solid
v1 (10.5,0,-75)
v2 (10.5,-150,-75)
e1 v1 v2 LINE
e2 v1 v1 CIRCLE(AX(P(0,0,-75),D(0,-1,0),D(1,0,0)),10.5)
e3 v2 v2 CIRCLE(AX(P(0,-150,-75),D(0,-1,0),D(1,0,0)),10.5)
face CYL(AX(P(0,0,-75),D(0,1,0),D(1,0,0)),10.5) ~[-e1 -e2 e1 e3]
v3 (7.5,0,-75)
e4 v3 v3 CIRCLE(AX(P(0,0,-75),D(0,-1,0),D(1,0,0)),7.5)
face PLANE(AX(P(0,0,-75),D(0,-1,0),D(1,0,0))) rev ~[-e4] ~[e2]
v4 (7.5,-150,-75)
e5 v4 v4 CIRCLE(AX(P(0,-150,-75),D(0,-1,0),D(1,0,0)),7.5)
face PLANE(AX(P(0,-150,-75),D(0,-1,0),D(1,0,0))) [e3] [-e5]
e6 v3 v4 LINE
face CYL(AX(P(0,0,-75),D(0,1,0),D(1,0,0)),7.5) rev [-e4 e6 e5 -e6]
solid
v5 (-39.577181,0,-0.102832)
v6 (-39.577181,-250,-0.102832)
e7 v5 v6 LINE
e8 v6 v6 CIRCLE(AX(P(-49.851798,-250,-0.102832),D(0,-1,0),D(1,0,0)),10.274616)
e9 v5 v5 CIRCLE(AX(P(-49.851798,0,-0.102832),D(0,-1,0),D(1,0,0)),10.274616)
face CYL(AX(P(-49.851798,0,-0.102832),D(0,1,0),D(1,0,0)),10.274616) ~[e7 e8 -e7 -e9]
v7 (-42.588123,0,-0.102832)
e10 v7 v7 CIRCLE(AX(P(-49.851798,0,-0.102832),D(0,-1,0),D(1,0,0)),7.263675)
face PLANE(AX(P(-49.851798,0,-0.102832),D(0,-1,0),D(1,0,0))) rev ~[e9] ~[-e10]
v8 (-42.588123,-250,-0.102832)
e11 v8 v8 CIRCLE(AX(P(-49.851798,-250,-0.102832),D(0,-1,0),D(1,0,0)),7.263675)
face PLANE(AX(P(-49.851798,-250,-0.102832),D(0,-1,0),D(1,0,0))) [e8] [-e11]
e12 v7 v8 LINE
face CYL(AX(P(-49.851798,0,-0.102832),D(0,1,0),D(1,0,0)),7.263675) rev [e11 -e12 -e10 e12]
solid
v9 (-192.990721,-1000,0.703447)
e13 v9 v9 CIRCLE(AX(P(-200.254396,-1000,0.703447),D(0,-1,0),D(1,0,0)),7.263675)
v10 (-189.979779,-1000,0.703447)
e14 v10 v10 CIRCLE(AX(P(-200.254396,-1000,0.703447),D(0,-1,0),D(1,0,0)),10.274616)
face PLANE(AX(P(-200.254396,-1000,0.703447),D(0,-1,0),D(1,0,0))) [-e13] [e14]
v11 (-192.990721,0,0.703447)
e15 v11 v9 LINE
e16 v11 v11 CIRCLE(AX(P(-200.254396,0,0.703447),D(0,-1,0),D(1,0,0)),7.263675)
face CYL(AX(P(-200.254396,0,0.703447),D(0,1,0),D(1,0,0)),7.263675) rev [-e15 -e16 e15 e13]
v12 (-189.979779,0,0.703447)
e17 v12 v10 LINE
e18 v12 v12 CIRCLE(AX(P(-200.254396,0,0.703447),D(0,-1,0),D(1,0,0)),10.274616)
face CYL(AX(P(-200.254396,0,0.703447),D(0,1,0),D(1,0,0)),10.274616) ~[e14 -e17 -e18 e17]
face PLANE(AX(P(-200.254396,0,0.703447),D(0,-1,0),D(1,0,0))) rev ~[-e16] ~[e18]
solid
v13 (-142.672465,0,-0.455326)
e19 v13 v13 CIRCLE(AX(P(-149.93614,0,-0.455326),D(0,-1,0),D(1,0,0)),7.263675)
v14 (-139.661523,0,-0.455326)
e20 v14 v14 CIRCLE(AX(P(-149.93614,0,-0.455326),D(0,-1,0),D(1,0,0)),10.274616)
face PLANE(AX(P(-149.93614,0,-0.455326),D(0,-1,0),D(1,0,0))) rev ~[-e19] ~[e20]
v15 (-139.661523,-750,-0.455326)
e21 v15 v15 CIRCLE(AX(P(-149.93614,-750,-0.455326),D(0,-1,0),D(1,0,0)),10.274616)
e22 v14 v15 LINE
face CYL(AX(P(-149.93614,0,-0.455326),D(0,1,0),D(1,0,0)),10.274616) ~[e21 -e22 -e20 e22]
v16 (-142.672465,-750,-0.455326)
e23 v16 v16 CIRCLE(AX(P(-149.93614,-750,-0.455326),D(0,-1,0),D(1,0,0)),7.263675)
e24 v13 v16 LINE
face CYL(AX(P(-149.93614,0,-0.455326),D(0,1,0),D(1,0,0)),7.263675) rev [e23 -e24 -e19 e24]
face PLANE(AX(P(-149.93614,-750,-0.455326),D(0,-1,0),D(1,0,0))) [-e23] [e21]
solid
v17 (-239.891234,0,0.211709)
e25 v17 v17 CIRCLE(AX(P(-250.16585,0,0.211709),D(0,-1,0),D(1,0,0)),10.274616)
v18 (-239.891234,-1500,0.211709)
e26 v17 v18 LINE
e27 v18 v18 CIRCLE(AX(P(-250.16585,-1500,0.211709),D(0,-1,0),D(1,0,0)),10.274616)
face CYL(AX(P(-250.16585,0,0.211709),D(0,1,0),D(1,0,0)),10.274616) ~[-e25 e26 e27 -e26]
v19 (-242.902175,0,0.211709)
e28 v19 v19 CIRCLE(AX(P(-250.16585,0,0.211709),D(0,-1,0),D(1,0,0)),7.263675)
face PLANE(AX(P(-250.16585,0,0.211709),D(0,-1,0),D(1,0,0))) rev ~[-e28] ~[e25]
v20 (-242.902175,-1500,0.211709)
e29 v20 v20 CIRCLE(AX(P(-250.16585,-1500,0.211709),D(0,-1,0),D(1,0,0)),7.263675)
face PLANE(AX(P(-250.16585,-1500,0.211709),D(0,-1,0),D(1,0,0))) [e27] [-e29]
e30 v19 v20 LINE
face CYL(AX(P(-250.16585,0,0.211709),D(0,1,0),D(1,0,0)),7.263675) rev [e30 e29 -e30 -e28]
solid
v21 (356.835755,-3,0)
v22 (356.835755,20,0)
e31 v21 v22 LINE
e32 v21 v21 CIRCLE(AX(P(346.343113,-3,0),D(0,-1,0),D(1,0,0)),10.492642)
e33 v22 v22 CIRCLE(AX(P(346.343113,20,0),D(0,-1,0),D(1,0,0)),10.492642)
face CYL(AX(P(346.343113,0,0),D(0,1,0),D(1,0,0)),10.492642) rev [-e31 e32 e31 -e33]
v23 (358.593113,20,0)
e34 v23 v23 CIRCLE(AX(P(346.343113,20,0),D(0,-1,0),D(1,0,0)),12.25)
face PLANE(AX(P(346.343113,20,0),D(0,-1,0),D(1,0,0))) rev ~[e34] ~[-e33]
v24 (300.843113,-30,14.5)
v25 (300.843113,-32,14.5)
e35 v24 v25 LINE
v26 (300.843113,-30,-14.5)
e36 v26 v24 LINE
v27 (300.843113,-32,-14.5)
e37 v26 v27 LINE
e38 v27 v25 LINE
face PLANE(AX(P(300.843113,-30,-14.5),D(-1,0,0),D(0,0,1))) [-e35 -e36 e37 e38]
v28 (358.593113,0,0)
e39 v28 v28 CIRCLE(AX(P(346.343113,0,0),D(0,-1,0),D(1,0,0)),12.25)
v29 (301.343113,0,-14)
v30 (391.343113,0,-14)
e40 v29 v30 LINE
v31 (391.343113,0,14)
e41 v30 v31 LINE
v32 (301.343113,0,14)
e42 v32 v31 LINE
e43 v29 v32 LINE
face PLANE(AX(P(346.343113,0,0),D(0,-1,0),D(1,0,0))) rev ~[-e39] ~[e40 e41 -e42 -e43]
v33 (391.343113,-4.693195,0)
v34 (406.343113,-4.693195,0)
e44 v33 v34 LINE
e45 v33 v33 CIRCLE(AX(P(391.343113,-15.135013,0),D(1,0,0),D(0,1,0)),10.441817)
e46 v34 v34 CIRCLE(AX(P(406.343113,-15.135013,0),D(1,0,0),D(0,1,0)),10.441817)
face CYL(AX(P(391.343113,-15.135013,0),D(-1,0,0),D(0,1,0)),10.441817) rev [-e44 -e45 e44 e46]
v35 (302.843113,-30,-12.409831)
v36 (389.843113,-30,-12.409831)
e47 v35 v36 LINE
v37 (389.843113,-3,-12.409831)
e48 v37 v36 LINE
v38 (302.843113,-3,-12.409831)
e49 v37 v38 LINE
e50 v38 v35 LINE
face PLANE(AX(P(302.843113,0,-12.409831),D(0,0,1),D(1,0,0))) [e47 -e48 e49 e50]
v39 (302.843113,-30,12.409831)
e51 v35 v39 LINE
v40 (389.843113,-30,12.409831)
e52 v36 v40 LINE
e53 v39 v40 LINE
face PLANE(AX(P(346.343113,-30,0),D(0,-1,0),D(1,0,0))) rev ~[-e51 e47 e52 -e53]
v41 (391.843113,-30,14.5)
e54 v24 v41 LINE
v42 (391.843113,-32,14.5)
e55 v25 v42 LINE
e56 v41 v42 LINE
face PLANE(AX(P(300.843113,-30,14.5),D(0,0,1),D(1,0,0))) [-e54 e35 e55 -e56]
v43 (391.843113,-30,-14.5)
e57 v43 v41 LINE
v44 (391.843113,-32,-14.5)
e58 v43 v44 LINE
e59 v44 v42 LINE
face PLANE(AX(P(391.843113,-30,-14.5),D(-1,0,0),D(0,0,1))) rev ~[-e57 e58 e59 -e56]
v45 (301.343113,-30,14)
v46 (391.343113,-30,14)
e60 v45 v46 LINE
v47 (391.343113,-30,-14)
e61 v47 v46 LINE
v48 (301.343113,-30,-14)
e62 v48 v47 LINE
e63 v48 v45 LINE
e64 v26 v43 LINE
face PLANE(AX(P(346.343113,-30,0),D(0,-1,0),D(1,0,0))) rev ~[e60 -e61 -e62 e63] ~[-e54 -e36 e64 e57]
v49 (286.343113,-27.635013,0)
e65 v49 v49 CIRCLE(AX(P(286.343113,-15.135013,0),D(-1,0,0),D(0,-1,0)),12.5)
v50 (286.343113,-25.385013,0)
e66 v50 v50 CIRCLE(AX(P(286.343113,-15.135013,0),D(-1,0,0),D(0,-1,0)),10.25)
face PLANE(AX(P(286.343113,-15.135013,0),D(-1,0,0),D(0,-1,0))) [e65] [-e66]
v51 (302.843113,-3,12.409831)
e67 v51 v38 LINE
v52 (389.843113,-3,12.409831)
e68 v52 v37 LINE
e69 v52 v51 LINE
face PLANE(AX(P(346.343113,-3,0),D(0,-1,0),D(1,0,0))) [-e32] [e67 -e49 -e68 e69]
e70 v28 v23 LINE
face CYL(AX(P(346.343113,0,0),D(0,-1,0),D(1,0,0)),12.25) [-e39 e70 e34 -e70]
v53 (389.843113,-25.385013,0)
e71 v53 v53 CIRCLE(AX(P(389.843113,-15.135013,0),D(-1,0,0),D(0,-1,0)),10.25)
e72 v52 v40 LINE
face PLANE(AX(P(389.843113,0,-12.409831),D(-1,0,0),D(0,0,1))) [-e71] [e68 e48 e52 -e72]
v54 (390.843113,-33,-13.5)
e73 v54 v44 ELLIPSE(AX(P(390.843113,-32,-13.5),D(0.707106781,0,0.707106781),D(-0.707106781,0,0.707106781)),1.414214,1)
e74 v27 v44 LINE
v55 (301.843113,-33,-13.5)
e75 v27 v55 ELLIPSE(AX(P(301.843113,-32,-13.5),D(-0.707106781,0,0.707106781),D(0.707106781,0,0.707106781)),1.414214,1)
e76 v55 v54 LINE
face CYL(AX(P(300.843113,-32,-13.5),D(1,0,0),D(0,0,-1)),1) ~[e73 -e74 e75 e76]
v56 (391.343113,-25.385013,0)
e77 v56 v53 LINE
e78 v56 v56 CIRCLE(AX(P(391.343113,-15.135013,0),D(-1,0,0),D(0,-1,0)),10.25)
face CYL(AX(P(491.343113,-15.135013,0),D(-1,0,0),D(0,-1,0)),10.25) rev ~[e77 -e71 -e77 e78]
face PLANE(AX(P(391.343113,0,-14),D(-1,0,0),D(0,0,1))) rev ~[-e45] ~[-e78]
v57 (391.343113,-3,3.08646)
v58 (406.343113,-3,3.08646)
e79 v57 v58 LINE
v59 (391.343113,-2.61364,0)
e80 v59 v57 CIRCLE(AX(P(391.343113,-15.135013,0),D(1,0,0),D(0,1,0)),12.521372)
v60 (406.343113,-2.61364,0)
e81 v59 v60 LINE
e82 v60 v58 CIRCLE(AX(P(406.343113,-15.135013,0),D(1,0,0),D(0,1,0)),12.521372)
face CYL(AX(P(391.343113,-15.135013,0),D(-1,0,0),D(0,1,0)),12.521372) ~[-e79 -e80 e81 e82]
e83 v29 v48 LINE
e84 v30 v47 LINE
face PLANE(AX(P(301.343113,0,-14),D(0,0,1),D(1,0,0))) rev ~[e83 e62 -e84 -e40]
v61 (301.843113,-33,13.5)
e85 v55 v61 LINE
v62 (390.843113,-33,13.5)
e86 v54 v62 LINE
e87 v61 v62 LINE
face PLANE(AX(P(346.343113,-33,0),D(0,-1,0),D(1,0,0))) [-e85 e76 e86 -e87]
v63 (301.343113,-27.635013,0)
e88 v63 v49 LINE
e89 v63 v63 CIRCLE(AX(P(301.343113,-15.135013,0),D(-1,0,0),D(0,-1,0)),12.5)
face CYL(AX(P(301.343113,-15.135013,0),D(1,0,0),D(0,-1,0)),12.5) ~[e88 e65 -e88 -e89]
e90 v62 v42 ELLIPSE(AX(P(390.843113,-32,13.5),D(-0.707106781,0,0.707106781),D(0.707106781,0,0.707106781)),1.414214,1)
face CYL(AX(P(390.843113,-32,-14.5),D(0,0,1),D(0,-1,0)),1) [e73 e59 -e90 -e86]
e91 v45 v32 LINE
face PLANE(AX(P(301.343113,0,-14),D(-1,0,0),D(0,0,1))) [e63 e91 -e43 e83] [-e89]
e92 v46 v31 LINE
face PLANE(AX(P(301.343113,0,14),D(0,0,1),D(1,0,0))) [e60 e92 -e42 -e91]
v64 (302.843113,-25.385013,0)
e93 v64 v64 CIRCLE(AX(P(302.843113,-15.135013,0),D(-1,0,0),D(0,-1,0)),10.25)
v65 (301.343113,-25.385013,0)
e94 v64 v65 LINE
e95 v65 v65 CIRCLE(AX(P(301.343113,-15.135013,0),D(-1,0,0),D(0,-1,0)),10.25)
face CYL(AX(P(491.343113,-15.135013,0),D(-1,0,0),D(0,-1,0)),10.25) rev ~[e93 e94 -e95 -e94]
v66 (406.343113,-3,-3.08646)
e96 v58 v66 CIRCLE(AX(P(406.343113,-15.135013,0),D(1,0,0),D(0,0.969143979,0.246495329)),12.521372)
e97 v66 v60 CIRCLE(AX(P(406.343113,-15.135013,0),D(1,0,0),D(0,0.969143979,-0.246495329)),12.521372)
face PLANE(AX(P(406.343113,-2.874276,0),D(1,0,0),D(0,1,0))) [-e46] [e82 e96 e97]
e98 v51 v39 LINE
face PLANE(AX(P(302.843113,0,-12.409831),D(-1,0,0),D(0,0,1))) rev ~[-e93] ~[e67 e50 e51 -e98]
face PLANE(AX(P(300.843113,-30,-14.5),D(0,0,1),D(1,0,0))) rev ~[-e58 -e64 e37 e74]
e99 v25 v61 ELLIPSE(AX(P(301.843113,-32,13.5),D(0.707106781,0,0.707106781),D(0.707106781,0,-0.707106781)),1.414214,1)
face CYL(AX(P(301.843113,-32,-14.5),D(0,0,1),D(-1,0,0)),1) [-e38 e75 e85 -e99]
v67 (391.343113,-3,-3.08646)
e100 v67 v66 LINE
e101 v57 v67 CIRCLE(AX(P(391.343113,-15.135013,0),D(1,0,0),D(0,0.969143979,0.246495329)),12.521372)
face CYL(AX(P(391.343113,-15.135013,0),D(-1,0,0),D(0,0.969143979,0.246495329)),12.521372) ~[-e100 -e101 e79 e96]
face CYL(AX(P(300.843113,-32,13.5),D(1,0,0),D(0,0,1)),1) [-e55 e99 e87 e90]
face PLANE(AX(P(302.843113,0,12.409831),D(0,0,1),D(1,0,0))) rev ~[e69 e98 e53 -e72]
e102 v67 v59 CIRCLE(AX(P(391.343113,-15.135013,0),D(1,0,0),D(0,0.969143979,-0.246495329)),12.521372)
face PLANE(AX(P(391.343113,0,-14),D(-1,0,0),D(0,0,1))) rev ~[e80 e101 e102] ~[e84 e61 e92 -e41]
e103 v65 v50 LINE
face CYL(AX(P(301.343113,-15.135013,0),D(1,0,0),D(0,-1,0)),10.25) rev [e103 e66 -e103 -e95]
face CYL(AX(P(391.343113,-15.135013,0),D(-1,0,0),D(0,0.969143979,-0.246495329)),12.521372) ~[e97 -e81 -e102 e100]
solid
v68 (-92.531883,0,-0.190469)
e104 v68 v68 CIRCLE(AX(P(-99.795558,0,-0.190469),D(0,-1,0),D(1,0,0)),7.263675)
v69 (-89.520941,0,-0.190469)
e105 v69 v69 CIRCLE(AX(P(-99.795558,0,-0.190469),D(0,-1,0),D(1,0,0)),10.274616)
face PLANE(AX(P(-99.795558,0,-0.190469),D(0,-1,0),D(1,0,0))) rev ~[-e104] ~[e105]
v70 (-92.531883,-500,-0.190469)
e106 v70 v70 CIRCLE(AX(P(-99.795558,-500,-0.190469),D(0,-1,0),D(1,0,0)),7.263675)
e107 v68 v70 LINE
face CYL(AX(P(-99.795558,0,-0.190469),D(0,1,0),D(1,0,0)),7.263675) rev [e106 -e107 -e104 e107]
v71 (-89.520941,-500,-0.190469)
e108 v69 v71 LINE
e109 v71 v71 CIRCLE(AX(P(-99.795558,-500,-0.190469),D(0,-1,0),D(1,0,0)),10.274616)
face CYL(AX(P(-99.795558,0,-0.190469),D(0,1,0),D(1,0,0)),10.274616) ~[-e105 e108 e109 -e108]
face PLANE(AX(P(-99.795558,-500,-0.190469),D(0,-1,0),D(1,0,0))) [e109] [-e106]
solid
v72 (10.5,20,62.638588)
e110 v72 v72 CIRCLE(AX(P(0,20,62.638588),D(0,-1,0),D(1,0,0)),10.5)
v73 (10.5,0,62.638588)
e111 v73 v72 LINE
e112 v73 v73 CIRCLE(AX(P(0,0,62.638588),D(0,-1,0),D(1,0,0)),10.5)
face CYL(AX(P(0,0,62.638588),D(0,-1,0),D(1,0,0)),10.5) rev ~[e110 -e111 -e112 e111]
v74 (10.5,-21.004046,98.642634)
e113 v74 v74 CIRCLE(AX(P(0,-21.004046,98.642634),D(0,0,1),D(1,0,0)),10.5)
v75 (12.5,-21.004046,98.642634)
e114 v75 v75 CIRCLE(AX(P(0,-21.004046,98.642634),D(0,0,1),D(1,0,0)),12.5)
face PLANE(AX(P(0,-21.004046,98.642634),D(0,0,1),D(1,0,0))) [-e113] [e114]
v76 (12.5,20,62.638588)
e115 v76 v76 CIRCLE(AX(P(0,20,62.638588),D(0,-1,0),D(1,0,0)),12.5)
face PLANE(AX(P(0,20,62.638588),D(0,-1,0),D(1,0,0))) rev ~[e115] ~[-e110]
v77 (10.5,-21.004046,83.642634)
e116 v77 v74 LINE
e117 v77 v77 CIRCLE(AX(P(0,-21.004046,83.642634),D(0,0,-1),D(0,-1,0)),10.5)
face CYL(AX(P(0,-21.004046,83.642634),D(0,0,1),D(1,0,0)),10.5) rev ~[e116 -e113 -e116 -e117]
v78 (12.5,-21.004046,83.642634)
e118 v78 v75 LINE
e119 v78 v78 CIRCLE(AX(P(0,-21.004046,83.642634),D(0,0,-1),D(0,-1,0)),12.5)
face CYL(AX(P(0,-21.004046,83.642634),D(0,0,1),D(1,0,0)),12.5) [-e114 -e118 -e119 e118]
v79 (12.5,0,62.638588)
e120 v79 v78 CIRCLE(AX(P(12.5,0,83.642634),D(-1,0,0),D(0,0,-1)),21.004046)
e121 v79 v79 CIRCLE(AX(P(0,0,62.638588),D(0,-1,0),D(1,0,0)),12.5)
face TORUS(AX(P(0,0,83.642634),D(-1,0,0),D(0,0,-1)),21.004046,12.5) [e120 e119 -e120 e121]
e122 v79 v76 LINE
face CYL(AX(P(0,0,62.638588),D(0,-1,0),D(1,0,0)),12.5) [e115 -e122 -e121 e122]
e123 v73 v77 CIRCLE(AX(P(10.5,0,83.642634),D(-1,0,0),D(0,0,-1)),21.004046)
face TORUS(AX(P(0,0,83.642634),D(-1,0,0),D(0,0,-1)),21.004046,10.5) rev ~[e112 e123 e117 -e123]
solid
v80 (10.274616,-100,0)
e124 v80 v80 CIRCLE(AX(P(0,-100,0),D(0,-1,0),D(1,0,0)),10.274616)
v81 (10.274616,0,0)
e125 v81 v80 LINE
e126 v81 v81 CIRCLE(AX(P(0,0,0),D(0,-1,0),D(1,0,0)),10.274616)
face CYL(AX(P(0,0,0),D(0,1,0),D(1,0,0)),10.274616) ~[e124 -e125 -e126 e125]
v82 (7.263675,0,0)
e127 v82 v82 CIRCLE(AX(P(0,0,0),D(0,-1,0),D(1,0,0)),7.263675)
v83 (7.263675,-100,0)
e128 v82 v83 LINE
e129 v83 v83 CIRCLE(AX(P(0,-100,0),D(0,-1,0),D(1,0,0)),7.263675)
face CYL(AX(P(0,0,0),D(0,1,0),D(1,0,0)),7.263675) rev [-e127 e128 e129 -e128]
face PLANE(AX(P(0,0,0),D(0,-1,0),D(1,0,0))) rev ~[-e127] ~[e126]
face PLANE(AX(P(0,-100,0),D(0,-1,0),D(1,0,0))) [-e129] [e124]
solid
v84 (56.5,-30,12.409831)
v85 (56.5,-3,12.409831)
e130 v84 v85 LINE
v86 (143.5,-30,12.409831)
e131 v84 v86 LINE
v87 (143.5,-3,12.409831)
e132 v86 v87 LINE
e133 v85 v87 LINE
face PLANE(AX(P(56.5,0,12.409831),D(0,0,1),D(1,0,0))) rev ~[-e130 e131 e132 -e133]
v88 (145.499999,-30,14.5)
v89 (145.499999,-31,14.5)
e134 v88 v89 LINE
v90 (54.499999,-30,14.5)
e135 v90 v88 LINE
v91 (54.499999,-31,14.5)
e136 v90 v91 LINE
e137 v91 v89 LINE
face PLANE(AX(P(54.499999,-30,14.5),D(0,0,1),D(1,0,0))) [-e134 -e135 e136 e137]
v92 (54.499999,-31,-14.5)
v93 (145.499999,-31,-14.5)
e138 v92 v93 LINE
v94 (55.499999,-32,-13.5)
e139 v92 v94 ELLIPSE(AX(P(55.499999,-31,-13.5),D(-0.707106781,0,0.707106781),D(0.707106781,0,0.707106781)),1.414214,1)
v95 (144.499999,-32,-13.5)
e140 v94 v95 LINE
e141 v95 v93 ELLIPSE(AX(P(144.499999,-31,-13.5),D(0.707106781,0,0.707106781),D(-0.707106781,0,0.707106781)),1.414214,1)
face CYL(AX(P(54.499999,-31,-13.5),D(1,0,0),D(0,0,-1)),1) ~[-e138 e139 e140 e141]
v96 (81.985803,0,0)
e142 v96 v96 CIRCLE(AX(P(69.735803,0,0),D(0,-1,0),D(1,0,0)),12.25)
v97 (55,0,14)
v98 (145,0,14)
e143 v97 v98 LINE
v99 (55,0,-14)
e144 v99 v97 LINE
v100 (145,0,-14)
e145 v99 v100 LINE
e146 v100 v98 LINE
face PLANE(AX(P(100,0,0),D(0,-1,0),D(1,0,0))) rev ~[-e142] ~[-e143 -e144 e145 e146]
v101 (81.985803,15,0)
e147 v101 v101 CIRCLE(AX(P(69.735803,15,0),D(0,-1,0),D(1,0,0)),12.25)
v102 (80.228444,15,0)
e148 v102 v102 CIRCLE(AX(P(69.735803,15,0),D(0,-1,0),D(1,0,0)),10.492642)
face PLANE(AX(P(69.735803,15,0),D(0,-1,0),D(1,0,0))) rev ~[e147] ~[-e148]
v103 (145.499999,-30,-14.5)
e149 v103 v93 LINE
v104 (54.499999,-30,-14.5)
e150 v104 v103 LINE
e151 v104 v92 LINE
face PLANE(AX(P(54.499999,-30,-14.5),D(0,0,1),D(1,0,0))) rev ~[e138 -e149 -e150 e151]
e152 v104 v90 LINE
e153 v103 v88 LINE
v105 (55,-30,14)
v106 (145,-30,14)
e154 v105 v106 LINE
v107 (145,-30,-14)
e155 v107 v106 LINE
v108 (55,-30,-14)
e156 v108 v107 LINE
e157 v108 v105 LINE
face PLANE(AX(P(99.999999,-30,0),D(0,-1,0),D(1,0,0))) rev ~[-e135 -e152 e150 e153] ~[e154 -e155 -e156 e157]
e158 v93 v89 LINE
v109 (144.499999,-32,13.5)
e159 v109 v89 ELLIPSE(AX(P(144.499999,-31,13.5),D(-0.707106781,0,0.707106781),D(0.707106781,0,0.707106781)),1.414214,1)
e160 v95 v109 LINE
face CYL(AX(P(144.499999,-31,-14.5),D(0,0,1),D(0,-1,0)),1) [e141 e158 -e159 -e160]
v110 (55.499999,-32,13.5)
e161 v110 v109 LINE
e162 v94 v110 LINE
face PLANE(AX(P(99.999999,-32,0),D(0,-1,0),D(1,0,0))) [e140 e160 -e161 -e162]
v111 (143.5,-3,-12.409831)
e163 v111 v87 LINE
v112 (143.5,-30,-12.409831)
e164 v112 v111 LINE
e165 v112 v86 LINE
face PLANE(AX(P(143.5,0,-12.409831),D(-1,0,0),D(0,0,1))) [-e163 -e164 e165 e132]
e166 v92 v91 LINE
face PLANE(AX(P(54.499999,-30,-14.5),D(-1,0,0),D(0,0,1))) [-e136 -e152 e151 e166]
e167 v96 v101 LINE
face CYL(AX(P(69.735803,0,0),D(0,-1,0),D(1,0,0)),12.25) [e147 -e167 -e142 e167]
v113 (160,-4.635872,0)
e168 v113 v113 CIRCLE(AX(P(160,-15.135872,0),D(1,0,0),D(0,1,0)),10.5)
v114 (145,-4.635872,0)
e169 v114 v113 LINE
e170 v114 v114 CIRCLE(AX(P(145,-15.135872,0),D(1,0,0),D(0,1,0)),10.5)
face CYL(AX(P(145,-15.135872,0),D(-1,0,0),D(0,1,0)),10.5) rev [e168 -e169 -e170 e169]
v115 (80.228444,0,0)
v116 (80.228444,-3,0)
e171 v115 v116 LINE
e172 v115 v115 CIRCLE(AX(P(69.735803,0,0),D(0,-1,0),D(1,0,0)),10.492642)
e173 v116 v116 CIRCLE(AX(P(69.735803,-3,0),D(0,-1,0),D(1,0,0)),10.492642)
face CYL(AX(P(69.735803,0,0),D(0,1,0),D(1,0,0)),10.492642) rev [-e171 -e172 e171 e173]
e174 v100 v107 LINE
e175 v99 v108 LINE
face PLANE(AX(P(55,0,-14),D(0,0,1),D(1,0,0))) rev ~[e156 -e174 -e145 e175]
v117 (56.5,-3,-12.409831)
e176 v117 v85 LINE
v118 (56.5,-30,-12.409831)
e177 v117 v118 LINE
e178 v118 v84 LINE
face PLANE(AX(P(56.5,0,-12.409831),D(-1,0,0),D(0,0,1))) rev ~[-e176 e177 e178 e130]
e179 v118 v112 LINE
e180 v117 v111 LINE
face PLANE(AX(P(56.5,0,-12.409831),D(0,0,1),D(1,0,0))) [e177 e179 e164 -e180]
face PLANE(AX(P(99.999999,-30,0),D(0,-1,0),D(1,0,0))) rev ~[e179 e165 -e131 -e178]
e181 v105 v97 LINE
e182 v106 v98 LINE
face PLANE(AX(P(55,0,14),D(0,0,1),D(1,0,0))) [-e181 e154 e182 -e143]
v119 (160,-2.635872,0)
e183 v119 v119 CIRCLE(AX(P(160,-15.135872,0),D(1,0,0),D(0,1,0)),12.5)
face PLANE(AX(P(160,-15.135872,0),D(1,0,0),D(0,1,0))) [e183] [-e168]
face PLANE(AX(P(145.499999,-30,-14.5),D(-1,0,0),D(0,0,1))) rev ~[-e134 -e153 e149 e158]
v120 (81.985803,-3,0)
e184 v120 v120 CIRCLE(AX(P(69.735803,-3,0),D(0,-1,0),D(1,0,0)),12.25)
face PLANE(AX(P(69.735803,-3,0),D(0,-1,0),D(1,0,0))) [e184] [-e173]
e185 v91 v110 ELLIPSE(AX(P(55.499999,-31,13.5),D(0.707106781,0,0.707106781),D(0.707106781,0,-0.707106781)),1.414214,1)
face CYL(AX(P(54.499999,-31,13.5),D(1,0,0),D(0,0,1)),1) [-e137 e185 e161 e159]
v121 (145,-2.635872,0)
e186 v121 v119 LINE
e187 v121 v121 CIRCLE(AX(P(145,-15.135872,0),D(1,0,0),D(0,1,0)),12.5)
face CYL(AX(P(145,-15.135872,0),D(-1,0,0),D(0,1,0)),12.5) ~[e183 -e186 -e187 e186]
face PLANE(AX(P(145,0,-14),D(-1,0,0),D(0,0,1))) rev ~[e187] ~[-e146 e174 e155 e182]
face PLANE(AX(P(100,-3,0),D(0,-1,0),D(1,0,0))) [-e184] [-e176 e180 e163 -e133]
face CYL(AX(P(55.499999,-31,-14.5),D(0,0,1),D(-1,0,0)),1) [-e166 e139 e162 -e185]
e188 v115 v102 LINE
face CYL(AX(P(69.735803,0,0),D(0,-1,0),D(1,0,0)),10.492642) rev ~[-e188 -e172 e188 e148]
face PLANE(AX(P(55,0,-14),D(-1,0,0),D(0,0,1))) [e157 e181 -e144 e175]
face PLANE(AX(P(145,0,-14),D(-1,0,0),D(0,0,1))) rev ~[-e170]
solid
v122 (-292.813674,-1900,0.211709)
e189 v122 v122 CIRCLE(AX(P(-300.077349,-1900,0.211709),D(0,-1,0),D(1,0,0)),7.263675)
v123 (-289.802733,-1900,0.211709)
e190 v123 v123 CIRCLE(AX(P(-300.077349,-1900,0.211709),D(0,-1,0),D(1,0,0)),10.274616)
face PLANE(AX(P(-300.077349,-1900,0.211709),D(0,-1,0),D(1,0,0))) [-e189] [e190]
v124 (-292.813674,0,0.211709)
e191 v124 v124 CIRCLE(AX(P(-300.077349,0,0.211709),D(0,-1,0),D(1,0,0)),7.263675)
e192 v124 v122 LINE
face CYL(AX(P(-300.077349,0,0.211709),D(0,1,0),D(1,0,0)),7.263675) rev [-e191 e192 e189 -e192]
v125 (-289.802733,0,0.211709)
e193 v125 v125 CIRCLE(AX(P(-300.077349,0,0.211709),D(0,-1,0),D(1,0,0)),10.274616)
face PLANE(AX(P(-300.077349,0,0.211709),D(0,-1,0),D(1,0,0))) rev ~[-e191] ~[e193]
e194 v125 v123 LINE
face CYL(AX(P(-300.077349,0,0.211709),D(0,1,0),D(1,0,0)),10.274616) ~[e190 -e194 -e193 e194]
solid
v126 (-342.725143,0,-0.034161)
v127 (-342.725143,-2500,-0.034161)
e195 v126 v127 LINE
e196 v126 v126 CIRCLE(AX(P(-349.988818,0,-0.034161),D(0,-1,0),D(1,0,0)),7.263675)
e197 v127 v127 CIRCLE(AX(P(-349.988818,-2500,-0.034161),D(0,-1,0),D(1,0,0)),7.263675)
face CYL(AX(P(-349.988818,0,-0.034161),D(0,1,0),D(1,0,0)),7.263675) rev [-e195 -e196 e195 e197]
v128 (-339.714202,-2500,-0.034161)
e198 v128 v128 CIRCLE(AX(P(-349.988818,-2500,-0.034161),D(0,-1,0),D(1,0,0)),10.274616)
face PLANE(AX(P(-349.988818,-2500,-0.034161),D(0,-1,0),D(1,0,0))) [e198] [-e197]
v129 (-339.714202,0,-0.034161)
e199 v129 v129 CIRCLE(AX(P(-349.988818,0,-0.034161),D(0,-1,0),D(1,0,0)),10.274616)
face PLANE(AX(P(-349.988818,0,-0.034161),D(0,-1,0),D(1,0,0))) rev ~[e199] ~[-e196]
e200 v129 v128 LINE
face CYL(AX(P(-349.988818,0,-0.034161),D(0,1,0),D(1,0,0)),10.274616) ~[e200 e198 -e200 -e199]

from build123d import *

# Parameters (mm, degrees)
F0_R        = 10.2746162667
F0_R_2      = 7.2636748813
F1_DEPTH    = 100
F2_DEPTH    = 250
F3_DEPTH    = 500
F4_DEPTH    = 750
F5_DEPTH    = 1000
F6_DEPTH    = 1500
F7_DEPTH    = 1900
F8_DEPTH    = 2500
F0_R_3      = 12.25
F0_R_4      = 10.4926415245
F9_DEPTH    = 15
F0_W        = 90
F0_H        = 28
F0_W_2      = 87
F0_H_2      = 24.8196627945
F9_FACE_R   = 12.25
F9_FACE_R_2 = 10.4926415245
F10_DEPTH   = 3
F11_DEPTH   = 30
F12_DEPTH   = 3
F13_W       = 91
F13_H       = 29
F14_DEPTH   = 2
F16_R       = 12.5
F16_R_2     = 10.5
F17_DEPTH   = 15
F18_R       = 1
F0_R_5      = 12.5
F0_R_6      = 10.5
F19_DEPTH   = 20
F0_R_7      = 7.5
F22_DEPTH   = 150
F23_DEPTH   = 20
F24_DEPTH   = 3
F25_DEPTH   = 30
F26_R       = 10.4418172779
F27_DEPTH   = 15
F28_D       = 20.5
F28_DEPTH   = 100
F28_TIP     = 6.158821345
F29_R       = 12.5
F29_R_2     = 10.25
F30_DEPTH   = 15
F31_W       = 91
F31_H       = 29
F31_W_2     = 90
F31_H_2     = 28
F31_W_3     = 87
F31_H_3     = 24.8196627945
F32_DEPTH   = 3
F33_R       = 1


# Not quite as in the source:
# - after a boolean that leaves OpenCascade's solid faulty, fix() repairs it


with BuildPart() as f1:
    # F0 (on Front) → F1 (new body)
    with BuildSketch(Plane.XZ):
        Circle(F0_R)
        Circle(F0_R_2, mode=Mode.SUBTRACT)
    extrude(amount=F1_DEPTH)


with BuildPart() as f2:
    # F0 (on Front) → F2 (new body)
    with BuildSketch(Plane.XZ):
        with Locations((-49.8517975211, -0.1028322222)):
            Circle(F0_R)
        with Locations((-49.8517975211, -0.1028322222)):
            Circle(F0_R_2, mode=Mode.SUBTRACT)
    extrude(amount=F2_DEPTH)


with BuildPart() as f3:
    # F0 (on Front) → F3 (new body)
    with BuildSketch(Plane.XZ):
        with Locations((-99.7955575585, -0.1904692035)):
            Circle(F0_R)
        with Locations((-99.7955575585, -0.1904692035)):
            Circle(F0_R_2, mode=Mode.SUBTRACT)
    extrude(amount=F3_DEPTH)


with BuildPart() as f4:
    # F0 (on Front) → F4 (new body)
    with BuildSketch(Plane.XZ):
        with Locations((-149.9361395836, -0.455326488)):
            Circle(F0_R)
        with Locations((-149.9361395836, -0.455326488)):
            Circle(F0_R_2, mode=Mode.SUBTRACT)
    extrude(amount=F4_DEPTH)


with BuildPart() as f5:
    # F0 (on Front) → F5 (new body)
    with BuildSketch(Plane.XZ):
        with Locations((-200.2543956041, 0.7034467999)):
            Circle(F0_R)
        with Locations((-200.2543956041, 0.7034467999)):
            Circle(F0_R_2, mode=Mode.SUBTRACT)
    extrude(amount=F5_DEPTH)


with BuildPart() as f6:
    # F0 (on Front) → F6 (new body)
    with BuildSketch(Plane.XZ):
        with Locations((-250.1658499241, 0.211708757)):
            Circle(F0_R)
        with Locations((-250.1658499241, 0.211708757)):
            Circle(F0_R_2, mode=Mode.SUBTRACT)
    extrude(amount=F6_DEPTH)


with BuildPart() as f7:
    # F0 (on Front) → F7 (new body)
    with BuildSketch(Plane.XZ):
        with Locations((-300.0773489475, 0.2117086115)):
            Circle(F0_R)
        with Locations((-300.0773489475, 0.2117086115)):
            Circle(F0_R_2, mode=Mode.SUBTRACT)
    extrude(amount=F7_DEPTH)


with BuildPart() as f8:
    # F0 (on Front) → F8 (new body)
    with BuildSketch(Plane.XZ):
        with Locations((-349.9888181686, -0.0341606319)):
            Circle(F0_R)
        with Locations((-349.9888181686, -0.0341606319)):
            Circle(F0_R_2, mode=Mode.SUBTRACT)
    extrude(amount=F8_DEPTH)


with BuildPart() as f9:
    # F0 (on Front) → F9 (new body)
    with BuildSketch(Plane.XZ):
        with Locations((69.7358027101, 0)):
            Circle(F0_R_3)
        with Locations((69.7358027101, 0)):
            Circle(F0_R_4, mode=Mode.SUBTRACT)
    extrude(amount=-F9_DEPTH)

    # F0 (on Front) + F9_face (on face) → F10 (join)
    with BuildSketch(Plane.XZ):
        with Locations((100, 0)):
            Rectangle(F0_W, F0_H)
        with Locations((100, 0)):
            Rectangle(F0_W_2, F0_H_2, mode=Mode.SUBTRACT)
    with BuildSketch(Plane(origin=(69.7358027101, 0, 0), x_dir=(1, 0, 0), z_dir=(0, -1, 0))):
        Circle(F9_FACE_R)
        Circle(F9_FACE_R_2, mode=Mode.SUBTRACT)
    extrude(amount=F10_DEPTH)

    # F0 (on Front) → F11 (join)
    with BuildSketch(Plane.XZ):
        with Locations((100, 0)):
            Rectangle(F0_W, F0_H)
        with Locations((100, 0)):
            Rectangle(F0_W_2, F0_H_2, mode=Mode.SUBTRACT)
    extrude(amount=F11_DEPTH)

    # F0 (on Front) → F12 (join)
    with BuildSketch(Plane.XZ):
        with Locations((100, 0)):
            Rectangle(F0_W_2, F0_H_2)
        with Locations((69.7358027101, 0)):
            Circle(F0_R_3, mode=Mode.SUBTRACT)
        with Locations((69.7358027101, 0)):
            Circle(F0_R_3)
        with Locations((69.7358027101, 0)):
            Circle(F0_R_4, mode=Mode.SUBTRACT)
    extrude(amount=F12_DEPTH)

    # F13 (on face) → F14 (join)
    with BuildSketch(Plane.XZ.offset(30)):
        with Locations((99.9999986887, 4.172e-07)):
            Rectangle(F13_W, F13_H)
    extrude(amount=F14_DEPTH)

    # F16 (on offset) → F17 (join)
    with BuildSketch(Plane.YZ.offset(145)):
        with Locations((-15.1358721778, 0)):
            Circle(F16_R)
        with Locations((-15.1358721778, 0)):
            Circle(F16_R_2, mode=Mode.SUBTRACT)
    extrude(amount=F17_DEPTH)

    # F18
    f18_edges = [f9.edges().sort_by_distance(p)[0] for p in [
        (145.499999, -32, 0),
        (99.999999, -32, 14.5),
        (54.499999, -32, 0),
        (99.999999, -32, -14.5),
    ]]
    fillet(f18_edges, radius=F18_R)


with BuildPart() as f19:
    # F0 (on Front) → F19 (new body)
    with BuildSketch(Plane.XZ):
        with Locations((0, 62.6385882497)):
            Circle(F0_R_5)
        with Locations((0, 62.6385882497)):
            Circle(F0_R_6, mode=Mode.SUBTRACT)
    extrude(amount=-F19_DEPTH)

    # F21: sweep along a path in F20
    with BuildLine(Plane.YZ) as f21_path:
        ThreePointArc((0, 62.6426339149), (-14.8492424049, 68.79339151), (-21, 83.6426339149))
        Line((-21, 83.6426339149), (-21, 98.6426339149))
    # F0 (on Front) → F21 (sweep)
    with BuildSketch(Plane.XZ):
        with Locations((0, 62.6385882497)):
            Circle(F0_R_5)
        with Locations((0, 62.6385882497)):
            Circle(F0_R_6, mode=Mode.SUBTRACT)
    sweep(path=f21_path.line)


with BuildPart() as f22:
    # F0 (on Front) → F22 (new body)
    with BuildSketch(Plane.XZ):
        with Locations((0, -75)):
            Circle(F0_R_6)
        with Locations((0, -75)):
            Circle(F0_R_7, mode=Mode.SUBTRACT)
    extrude(amount=F22_DEPTH)


with BuildPart() as f23:
    # F0 (on Front) → F23 (new body)
    with BuildSketch(Plane.XZ):
        with Locations((346.343113184, 0)):
            Circle(F0_R_3)
        with Locations((346.343113184, 0)):
            Circle(F0_R_4, mode=Mode.SUBTRACT)
    extrude(amount=-F23_DEPTH)

    # F0 (on Front) → F24 (join)
    with BuildSketch(Plane.XZ):
        with Locations((346.343113184, 0)):
            Rectangle(F0_W, F0_H)
        with Locations((346.343113184, 0)):
            Rectangle(F0_W_2, F0_H_2, mode=Mode.SUBTRACT)
        with Locations((346.343113184, 0)):
            Rectangle(F0_W_2, F0_H_2)
        with Locations((346.343113184, 0)):
            Circle(F0_R_3, mode=Mode.SUBTRACT)
        with Locations((346.343113184, 0)):
            Circle(F0_R_3)
        with Locations((346.343113184, 0)):
            Circle(F0_R_4, mode=Mode.SUBTRACT)
    extrude(amount=F24_DEPTH)

    # F0 (on Front) → F25 (join)
    with BuildSketch(Plane.XZ):
        with Locations((346.343113184, 0)):
            Rectangle(F0_W, F0_H)
        with Locations((346.343113184, 0)):
            Rectangle(F0_W_2, F0_H_2, mode=Mode.SUBTRACT)
    extrude(amount=F25_DEPTH)

    # F26 (on face) → F27 (join)
    with BuildSketch(Plane.YZ.offset(391.343113184)):
        with BuildLine():
            ThreePointArc((-3, -3.0864597825), (-2.7106056582, -1.5552739167), (-2.6136402784, 0))
            ThreePointArc((-2.6136402784, 0), (-2.7106056582, 1.5552739167), (-3, 3.0864597825))
            Line((-3, 3.0864597825), (-3, -3.0864597825))
        make_face()
        with BuildLine():
            Line((-3, -3.0864597825), (-3, 3.0864597825))
            ThreePointArc((-3, 3.0864597825), (-27.6563848557, 0), (-3, -3.0864597825))
        make_face()
        with Locations((-15.135012567, 0)):
            Circle(F26_R, mode=Mode.SUBTRACT)
    extrude(amount=F27_DEPTH)

    # F28
    with Locations(Plane.YZ.offset(391.343113184)):
        with Locations((-15.135012567, 0)):
            Hole(F28_D / 2, depth=F28_DEPTH)
            with Locations((0, 0, -(F28_DEPTH + F28_TIP / 2))):  # 118° drill point
                Cone(0, F28_D / 2, F28_TIP, mode=Mode.SUBTRACT)

    # F29 (on face) → F30 (join)
    with BuildSketch(Plane(origin=(301.343113184, 0, 0), x_dir=(0, -1, 0), z_dir=(-1, 0, 0))):
        with Locations((15.135012567, 0)):
            Circle(F29_R)
        with Locations((15.135012567, 0)):
            Circle(F29_R_2, mode=Mode.SUBTRACT)
    extrude(amount=F30_DEPTH)

    # F31 (on face) → F32 (join)
    with BuildSketch(Plane.XZ.offset(30)):
        with Locations((346.343113184, -4.172e-07)):
            Rectangle(F31_W, F31_H)
        with Locations((346.343113184, 0)):
            Rectangle(F31_W_2, F31_H_2, mode=Mode.SUBTRACT)
        with Locations((346.343113184, 0)):
            Rectangle(F31_W_2, F31_H_2)
        with Locations((346.343113184, 0)):
            Rectangle(F31_W_3, F31_H_3, mode=Mode.SUBTRACT)
        with Locations((346.343113184, 0)):
            Rectangle(F31_W_3, F31_H_3)
    extrude(amount=F32_DEPTH)

    add(f23.part.fix(), mode=Mode.REPLACE)

    # F33
    f33_edges = [f23.edges().sort_by_distance(p)[0] for p in [
        (391.843113, -33, 0),
        (346.343113, -33, 14.5),
        (300.843113, -33, 0),
        (346.343113, -33, -14.5),
    ]]
    fillet(f33_edges, radius=F33_R)


solid = Compound([f1.part, f2.part, f3.part, f4.part, f5.part, f6.part, f7.part, f8.part, f9.part, f19.part, f22.part, f23.part])
